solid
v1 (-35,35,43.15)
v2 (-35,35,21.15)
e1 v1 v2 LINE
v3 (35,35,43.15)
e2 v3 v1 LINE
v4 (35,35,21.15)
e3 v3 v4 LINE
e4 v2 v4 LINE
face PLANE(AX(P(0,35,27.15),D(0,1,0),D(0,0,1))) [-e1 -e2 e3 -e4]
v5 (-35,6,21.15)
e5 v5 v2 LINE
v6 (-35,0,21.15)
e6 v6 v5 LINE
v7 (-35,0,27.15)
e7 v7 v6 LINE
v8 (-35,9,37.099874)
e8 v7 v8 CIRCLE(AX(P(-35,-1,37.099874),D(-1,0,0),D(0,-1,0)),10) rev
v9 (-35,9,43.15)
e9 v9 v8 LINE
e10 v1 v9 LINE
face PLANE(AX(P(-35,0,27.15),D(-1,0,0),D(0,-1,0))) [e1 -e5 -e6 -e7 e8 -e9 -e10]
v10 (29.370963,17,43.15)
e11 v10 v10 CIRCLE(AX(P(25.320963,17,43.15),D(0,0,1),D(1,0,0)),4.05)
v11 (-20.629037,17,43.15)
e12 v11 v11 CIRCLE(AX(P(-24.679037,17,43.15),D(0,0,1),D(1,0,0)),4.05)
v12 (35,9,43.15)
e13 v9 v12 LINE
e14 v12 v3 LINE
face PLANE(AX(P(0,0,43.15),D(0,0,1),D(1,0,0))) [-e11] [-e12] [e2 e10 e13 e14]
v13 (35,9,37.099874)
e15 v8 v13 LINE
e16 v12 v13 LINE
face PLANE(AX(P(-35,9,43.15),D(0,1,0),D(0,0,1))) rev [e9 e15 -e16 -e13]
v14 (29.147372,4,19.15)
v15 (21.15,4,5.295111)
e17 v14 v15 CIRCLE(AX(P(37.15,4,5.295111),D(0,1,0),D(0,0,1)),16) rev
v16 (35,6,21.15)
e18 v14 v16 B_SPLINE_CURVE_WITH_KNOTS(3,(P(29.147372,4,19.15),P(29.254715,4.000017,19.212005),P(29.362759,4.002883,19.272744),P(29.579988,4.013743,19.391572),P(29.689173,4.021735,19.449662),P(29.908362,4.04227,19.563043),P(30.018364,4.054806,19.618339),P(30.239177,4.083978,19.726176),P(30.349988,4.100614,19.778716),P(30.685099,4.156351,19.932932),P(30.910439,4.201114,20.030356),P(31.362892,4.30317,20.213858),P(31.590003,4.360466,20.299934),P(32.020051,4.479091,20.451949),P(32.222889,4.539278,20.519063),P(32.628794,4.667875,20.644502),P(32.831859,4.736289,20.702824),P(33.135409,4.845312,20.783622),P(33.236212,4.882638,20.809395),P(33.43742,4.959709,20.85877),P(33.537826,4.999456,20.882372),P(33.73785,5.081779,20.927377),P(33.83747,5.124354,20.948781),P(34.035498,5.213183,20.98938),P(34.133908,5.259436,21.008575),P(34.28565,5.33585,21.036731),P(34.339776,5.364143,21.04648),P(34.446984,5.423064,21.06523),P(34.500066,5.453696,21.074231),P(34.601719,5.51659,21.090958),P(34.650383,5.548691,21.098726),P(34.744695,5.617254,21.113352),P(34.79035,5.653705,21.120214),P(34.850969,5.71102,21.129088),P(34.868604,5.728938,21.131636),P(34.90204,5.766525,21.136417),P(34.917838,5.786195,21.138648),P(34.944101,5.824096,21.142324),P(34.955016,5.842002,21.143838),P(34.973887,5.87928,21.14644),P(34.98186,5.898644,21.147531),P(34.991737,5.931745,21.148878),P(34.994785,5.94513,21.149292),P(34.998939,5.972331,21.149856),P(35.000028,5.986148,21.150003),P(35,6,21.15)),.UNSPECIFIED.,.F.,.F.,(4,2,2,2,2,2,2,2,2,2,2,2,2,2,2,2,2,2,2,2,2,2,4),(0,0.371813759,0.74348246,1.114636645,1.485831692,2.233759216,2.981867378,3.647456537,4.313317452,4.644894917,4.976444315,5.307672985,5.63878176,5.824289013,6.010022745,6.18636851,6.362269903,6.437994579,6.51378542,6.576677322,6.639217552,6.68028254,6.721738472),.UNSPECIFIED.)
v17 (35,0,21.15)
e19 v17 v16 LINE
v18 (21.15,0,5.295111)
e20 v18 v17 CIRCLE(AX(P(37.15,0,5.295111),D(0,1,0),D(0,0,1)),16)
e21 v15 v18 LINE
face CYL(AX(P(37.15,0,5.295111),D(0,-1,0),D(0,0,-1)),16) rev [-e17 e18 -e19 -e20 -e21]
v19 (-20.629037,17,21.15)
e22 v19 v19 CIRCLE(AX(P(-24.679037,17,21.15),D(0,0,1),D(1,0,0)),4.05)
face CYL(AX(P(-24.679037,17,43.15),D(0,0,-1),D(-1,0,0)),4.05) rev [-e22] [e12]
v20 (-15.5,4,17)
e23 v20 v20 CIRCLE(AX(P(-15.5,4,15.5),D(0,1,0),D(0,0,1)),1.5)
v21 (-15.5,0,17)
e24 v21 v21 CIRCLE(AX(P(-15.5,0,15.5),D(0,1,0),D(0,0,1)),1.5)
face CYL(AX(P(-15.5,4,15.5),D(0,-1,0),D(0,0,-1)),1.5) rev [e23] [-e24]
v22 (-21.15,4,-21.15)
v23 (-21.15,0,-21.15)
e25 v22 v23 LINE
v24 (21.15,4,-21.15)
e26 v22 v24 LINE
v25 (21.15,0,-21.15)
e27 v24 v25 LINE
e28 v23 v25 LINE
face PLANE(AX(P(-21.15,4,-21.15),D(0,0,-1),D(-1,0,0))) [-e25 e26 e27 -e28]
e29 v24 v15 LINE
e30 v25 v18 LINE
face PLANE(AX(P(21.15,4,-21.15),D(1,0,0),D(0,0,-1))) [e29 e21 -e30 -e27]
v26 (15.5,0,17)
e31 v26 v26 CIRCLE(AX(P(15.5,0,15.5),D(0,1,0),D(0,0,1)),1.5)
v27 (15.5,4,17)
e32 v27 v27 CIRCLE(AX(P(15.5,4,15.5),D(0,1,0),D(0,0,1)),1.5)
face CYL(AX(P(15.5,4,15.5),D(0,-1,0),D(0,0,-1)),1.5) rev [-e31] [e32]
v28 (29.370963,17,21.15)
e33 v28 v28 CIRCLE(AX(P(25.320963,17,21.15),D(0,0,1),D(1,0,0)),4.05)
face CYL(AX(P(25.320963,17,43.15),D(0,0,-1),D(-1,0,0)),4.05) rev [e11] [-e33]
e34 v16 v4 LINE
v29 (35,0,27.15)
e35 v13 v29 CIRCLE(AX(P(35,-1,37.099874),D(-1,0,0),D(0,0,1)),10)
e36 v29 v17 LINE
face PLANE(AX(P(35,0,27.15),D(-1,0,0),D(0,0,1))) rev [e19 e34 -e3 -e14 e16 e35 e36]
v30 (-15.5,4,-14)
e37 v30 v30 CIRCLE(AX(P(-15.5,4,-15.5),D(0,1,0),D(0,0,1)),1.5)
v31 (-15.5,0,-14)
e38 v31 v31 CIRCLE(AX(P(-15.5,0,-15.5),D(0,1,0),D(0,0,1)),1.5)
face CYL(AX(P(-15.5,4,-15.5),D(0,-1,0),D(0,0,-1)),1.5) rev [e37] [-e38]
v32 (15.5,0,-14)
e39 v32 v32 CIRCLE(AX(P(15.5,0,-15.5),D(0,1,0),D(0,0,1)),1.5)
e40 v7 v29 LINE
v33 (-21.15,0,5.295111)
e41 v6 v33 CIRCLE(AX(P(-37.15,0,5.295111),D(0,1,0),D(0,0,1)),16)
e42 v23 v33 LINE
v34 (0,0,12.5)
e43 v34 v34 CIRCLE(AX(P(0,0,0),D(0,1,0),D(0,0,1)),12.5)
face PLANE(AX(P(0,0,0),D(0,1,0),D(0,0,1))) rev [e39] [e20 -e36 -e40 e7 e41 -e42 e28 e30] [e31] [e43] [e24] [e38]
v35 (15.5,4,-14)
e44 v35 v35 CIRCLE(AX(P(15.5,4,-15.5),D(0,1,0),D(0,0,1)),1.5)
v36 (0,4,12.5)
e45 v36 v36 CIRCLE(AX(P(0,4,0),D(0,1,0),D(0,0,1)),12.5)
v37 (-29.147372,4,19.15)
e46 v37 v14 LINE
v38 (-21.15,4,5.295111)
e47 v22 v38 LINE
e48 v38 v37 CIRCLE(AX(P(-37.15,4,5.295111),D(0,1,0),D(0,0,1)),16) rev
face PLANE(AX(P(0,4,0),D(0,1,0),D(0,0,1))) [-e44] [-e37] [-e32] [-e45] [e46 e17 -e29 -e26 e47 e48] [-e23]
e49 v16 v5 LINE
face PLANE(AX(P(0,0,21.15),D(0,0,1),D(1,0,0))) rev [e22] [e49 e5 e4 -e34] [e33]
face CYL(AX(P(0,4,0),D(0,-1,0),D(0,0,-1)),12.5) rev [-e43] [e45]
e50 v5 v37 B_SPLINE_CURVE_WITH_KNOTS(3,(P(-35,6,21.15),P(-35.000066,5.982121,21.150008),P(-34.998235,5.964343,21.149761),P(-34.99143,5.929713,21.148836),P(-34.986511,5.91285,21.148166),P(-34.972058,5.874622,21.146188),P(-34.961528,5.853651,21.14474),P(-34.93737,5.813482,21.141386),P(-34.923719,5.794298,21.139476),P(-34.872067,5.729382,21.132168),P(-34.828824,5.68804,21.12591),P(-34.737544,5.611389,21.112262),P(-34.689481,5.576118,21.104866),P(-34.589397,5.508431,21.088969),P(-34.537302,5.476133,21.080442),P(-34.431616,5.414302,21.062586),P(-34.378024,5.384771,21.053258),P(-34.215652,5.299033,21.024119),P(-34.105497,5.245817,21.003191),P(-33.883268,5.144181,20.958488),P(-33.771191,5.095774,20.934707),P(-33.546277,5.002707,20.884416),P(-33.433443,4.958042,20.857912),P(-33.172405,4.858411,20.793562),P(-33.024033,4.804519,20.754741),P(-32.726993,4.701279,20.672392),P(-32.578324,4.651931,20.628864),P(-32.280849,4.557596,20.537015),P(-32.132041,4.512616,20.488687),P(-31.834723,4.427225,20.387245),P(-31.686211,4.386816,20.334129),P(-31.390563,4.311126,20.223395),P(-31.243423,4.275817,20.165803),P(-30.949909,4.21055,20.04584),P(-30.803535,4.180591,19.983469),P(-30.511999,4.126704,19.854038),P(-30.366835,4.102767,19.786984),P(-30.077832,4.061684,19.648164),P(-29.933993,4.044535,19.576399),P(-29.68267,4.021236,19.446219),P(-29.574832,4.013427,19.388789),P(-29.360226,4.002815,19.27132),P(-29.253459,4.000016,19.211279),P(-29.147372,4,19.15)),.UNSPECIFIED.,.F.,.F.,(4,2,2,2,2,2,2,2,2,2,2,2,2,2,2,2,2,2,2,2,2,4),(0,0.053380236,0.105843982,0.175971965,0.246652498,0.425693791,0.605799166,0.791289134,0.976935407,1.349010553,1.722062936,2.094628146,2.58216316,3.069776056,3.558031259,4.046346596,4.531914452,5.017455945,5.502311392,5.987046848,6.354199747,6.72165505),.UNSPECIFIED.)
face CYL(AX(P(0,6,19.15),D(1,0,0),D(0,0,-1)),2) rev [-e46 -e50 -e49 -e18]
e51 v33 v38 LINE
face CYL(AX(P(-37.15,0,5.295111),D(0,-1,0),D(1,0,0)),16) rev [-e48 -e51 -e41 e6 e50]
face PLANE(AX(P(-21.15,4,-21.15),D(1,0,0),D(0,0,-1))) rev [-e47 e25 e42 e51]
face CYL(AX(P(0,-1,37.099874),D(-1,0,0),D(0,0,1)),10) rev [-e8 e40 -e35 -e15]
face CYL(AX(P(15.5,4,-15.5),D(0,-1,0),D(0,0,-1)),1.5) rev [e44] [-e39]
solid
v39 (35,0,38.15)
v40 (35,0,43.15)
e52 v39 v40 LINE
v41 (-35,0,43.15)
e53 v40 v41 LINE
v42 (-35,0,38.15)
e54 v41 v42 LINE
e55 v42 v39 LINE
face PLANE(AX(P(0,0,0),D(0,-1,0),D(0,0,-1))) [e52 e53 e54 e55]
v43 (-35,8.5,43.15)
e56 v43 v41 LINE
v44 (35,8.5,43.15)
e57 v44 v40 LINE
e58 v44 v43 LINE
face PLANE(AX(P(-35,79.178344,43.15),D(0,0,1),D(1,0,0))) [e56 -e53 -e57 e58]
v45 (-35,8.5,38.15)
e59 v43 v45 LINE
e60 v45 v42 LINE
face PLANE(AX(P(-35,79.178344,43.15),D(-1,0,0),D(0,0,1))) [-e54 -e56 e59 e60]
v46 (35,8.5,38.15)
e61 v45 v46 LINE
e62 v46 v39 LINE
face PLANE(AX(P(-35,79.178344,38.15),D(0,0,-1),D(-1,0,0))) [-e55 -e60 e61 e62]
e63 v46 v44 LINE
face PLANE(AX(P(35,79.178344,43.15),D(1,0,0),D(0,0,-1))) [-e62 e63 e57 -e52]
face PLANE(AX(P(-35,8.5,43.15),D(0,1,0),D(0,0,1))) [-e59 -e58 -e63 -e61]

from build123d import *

# Parameters (mm, degrees)
SKETCH1_W           = 42.3
SKETCH1_H           = 42.3
SKETCH1_R           = 1.5
SKETCH1_R_2         = 12.5
BOSS_EXTRUDE1_DEPTH = 4
SKETCH2_W           = 70
SKETCH2_H           = 35
BOSS_EXTRUDE3_DEPTH = 6
SKETCH5_W           = 70
SKETCH5_H           = 26
SKETCH5_R           = 4.05
BOSS_EXTRUDE7_DEPTH = 16
CUT_EXTRUDE1_START  = -16
SKETCH5_2_R         = 4.05
CUT_EXTRUDE1_DEPTH  = 16
FILLET1_R           = 16
FILLET2_R           = 10
FILLET4_R           = 2
SKETCH6_W           = 70
SKETCH6_H           = 5
BOSS_EXTRUDE8_DEPTH = 8.5


with BuildPart() as part:
    # Sketch1 → Boss-Extrude1 (new body)
    with BuildSketch(Plane(origin=(0, 0, 0), x_dir=(1, 0, 0), z_dir=(0, 1, 0))):
        Rectangle(SKETCH1_W, SKETCH1_H)
        with Locations(Location((-15.5, 15.5, 0), (0, 0, 270))):
            Circle(SKETCH1_R, mode=Mode.SUBTRACT)
        with Locations(Location((15.5, 15.5, 0), (0, 0, 270))):
            Circle(SKETCH1_R, mode=Mode.SUBTRACT)
        with Locations(Location((15.5, -15.5, 0), (0, 0, 270))):
            Circle(SKETCH1_R, mode=Mode.SUBTRACT)
        with Locations(Location((-15.5, -15.5, 0), (0, 0, 270))):
            Circle(SKETCH1_R, mode=Mode.SUBTRACT)
        with Locations(Location((0, 0, 0), (0, 0, 270))):
            Circle(SKETCH1_R_2, mode=Mode.SUBTRACT)
    extrude(amount=BOSS_EXTRUDE1_DEPTH)

    # Sketch2 → Boss-Extrude3 (add)
    with BuildSketch(Plane.XY.offset(21.15)):
        with Locations((0, 17.5)):
            Rectangle(SKETCH2_W, SKETCH2_H)
    extrude(amount=BOSS_EXTRUDE3_DEPTH)

    # Sketch5 → Boss-Extrude7 (add)
    with BuildSketch(Plane.XY.offset(27.15)):
        with Locations((0, 22)):
            Rectangle(SKETCH5_W, SKETCH5_H)
        with Locations((-24.679036529, 17)):
            Circle(SKETCH5_R, mode=Mode.SUBTRACT)
        with Locations((25.320963471, 17)):
            Circle(SKETCH5_R, mode=Mode.SUBTRACT)
    extrude(amount=BOSS_EXTRUDE7_DEPTH)

    # Sketch5<2> → Cut-Extrude1 (cut)
    with BuildSketch(Plane.XY.offset(27.15).offset(CUT_EXTRUDE1_START)):
        with Locations((-24.679036529, 17)):
            Circle(SKETCH5_2_R)
        with Locations((25.320963471, 17)):
            Circle(SKETCH5_2_R)
    extrude(amount=CUT_EXTRUDE1_DEPTH, mode=Mode.SUBTRACT)

    # Fillet1
    # the kernel refuses this fillet: 16 mm, written as the material it adds along each edge
    with BuildSketch(Plane(origin=(21.15, 0, 21.15), x_dir=(1, 0, 0), z_dir=(0, 1, 0))) as fillet1_piece_1:
        with BuildLine():
            CenterArc((16, 15.854888836), FILLET1_R, 180, 82.27751927)
            Line((0, 15.854888836), (-0.32, 15.854888836))
            Line((-0.32, 15.854888836), (-0.32, 0))
            Line((-0.32, 0), (0, -0.32))
            ThreePointArc((0, -0.32), (6.925, -0.32), (13.807, -0.317097777))
            Line((13.807, -0.317097777), (13.85, 0))
        make_face()
    extrude(amount=4)
    with BuildSketch(Plane(origin=(-21.15, 0, 21.15), x_dir=(-1, 0, 0), z_dir=(0, 1, 0))) as fillet1_piece_2:
        with BuildLine():
            CenterArc((16, -15.854888836), FILLET1_R, 97.72248073, 82.27751927)
            Line((0, -15.854888836), (-0.32, -15.854888836))
            Line((-0.32, -15.854888836), (-0.32, 0))
            Line((-0.32, 0), (0, 0.32))
            ThreePointArc((0, 0.32), (6.925, 0.32), (13.807, 0.317097777))
            Line((13.807, 0.317097777), (13.85, 0))
        make_face()
    extrude(amount=4)

    # Fillet2
    # the kernel refuses this fillet: 10 mm, written as the material it adds along each edge
    with BuildSketch(Plane(origin=(35, 9, 27.15), x_dir=(0, 0, 1), z_dir=(-1, 0, 0))) as fillet2_piece_1:
        with BuildLine():
            CenterArc((9.949874371, -10), FILLET2_R, 90, 84.260829523)
            Line((0, -9), (-0.198997487, -8.98))
            ThreePointArc((-0.198997487, -8.98), (-0.2, -4.5), (-0.2, 0))
            Line((-0.2, 0), (0, 0.2))
            Line((0, 0.2), (9.949874371, 0.2))
            Line((9.949874371, 0.2), (9.949874371, 0))
        make_face()
    extrude(amount=70)

    # Fillet4
    # the kernel refuses this fillet: 2 mm, written as the material it adds along each edge
    with BuildSketch(Plane(origin=(-35, 4, 21.15), x_dir=(0, 1, 0), z_dir=(1, 0, 0))) as fillet4_piece_1_section:
        with BuildLine():
            CenterArc((FILLET4_R, -FILLET4_R), FILLET4_R, 90, 90)
            Line((0, -FILLET4_R), (0, 0))
            Line((0, 0), (FILLET4_R, 0))
        make_face()
    fillet4_piece_1 = extrude(amount=70, mode=Mode.PRIVATE)
    fillet4_piece_1 = fillet4_piece_1 - Plane(origin=(-37.15, 4.464640399, 5.295111164), x_dir=(-1, 0, 0), z_dir=(0, -1, 0)) * Cylinder(16, 148, mode=Mode.PRIVATE)
    fillet4_piece_1 = fillet4_piece_1 - Plane(origin=(37.15, 4.464640399, 5.295111164), x_dir=(1, 0, 0), z_dir=(0, -1, 0)) * Cylinder(16, 148, mode=Mode.PRIVATE)
    add(fillet4_piece_1)


with BuildPart() as body_2:
    # Sketch6 → Boss-Extrude8 (new body)
    with BuildSketch(Plane.XZ):
        with Locations((0, 40.65)):
            Rectangle(SKETCH6_W, SKETCH6_H)
    extrude(amount=-BOSS_EXTRUDE8_DEPTH)


solid = Compound([part.part, body_2.part])
